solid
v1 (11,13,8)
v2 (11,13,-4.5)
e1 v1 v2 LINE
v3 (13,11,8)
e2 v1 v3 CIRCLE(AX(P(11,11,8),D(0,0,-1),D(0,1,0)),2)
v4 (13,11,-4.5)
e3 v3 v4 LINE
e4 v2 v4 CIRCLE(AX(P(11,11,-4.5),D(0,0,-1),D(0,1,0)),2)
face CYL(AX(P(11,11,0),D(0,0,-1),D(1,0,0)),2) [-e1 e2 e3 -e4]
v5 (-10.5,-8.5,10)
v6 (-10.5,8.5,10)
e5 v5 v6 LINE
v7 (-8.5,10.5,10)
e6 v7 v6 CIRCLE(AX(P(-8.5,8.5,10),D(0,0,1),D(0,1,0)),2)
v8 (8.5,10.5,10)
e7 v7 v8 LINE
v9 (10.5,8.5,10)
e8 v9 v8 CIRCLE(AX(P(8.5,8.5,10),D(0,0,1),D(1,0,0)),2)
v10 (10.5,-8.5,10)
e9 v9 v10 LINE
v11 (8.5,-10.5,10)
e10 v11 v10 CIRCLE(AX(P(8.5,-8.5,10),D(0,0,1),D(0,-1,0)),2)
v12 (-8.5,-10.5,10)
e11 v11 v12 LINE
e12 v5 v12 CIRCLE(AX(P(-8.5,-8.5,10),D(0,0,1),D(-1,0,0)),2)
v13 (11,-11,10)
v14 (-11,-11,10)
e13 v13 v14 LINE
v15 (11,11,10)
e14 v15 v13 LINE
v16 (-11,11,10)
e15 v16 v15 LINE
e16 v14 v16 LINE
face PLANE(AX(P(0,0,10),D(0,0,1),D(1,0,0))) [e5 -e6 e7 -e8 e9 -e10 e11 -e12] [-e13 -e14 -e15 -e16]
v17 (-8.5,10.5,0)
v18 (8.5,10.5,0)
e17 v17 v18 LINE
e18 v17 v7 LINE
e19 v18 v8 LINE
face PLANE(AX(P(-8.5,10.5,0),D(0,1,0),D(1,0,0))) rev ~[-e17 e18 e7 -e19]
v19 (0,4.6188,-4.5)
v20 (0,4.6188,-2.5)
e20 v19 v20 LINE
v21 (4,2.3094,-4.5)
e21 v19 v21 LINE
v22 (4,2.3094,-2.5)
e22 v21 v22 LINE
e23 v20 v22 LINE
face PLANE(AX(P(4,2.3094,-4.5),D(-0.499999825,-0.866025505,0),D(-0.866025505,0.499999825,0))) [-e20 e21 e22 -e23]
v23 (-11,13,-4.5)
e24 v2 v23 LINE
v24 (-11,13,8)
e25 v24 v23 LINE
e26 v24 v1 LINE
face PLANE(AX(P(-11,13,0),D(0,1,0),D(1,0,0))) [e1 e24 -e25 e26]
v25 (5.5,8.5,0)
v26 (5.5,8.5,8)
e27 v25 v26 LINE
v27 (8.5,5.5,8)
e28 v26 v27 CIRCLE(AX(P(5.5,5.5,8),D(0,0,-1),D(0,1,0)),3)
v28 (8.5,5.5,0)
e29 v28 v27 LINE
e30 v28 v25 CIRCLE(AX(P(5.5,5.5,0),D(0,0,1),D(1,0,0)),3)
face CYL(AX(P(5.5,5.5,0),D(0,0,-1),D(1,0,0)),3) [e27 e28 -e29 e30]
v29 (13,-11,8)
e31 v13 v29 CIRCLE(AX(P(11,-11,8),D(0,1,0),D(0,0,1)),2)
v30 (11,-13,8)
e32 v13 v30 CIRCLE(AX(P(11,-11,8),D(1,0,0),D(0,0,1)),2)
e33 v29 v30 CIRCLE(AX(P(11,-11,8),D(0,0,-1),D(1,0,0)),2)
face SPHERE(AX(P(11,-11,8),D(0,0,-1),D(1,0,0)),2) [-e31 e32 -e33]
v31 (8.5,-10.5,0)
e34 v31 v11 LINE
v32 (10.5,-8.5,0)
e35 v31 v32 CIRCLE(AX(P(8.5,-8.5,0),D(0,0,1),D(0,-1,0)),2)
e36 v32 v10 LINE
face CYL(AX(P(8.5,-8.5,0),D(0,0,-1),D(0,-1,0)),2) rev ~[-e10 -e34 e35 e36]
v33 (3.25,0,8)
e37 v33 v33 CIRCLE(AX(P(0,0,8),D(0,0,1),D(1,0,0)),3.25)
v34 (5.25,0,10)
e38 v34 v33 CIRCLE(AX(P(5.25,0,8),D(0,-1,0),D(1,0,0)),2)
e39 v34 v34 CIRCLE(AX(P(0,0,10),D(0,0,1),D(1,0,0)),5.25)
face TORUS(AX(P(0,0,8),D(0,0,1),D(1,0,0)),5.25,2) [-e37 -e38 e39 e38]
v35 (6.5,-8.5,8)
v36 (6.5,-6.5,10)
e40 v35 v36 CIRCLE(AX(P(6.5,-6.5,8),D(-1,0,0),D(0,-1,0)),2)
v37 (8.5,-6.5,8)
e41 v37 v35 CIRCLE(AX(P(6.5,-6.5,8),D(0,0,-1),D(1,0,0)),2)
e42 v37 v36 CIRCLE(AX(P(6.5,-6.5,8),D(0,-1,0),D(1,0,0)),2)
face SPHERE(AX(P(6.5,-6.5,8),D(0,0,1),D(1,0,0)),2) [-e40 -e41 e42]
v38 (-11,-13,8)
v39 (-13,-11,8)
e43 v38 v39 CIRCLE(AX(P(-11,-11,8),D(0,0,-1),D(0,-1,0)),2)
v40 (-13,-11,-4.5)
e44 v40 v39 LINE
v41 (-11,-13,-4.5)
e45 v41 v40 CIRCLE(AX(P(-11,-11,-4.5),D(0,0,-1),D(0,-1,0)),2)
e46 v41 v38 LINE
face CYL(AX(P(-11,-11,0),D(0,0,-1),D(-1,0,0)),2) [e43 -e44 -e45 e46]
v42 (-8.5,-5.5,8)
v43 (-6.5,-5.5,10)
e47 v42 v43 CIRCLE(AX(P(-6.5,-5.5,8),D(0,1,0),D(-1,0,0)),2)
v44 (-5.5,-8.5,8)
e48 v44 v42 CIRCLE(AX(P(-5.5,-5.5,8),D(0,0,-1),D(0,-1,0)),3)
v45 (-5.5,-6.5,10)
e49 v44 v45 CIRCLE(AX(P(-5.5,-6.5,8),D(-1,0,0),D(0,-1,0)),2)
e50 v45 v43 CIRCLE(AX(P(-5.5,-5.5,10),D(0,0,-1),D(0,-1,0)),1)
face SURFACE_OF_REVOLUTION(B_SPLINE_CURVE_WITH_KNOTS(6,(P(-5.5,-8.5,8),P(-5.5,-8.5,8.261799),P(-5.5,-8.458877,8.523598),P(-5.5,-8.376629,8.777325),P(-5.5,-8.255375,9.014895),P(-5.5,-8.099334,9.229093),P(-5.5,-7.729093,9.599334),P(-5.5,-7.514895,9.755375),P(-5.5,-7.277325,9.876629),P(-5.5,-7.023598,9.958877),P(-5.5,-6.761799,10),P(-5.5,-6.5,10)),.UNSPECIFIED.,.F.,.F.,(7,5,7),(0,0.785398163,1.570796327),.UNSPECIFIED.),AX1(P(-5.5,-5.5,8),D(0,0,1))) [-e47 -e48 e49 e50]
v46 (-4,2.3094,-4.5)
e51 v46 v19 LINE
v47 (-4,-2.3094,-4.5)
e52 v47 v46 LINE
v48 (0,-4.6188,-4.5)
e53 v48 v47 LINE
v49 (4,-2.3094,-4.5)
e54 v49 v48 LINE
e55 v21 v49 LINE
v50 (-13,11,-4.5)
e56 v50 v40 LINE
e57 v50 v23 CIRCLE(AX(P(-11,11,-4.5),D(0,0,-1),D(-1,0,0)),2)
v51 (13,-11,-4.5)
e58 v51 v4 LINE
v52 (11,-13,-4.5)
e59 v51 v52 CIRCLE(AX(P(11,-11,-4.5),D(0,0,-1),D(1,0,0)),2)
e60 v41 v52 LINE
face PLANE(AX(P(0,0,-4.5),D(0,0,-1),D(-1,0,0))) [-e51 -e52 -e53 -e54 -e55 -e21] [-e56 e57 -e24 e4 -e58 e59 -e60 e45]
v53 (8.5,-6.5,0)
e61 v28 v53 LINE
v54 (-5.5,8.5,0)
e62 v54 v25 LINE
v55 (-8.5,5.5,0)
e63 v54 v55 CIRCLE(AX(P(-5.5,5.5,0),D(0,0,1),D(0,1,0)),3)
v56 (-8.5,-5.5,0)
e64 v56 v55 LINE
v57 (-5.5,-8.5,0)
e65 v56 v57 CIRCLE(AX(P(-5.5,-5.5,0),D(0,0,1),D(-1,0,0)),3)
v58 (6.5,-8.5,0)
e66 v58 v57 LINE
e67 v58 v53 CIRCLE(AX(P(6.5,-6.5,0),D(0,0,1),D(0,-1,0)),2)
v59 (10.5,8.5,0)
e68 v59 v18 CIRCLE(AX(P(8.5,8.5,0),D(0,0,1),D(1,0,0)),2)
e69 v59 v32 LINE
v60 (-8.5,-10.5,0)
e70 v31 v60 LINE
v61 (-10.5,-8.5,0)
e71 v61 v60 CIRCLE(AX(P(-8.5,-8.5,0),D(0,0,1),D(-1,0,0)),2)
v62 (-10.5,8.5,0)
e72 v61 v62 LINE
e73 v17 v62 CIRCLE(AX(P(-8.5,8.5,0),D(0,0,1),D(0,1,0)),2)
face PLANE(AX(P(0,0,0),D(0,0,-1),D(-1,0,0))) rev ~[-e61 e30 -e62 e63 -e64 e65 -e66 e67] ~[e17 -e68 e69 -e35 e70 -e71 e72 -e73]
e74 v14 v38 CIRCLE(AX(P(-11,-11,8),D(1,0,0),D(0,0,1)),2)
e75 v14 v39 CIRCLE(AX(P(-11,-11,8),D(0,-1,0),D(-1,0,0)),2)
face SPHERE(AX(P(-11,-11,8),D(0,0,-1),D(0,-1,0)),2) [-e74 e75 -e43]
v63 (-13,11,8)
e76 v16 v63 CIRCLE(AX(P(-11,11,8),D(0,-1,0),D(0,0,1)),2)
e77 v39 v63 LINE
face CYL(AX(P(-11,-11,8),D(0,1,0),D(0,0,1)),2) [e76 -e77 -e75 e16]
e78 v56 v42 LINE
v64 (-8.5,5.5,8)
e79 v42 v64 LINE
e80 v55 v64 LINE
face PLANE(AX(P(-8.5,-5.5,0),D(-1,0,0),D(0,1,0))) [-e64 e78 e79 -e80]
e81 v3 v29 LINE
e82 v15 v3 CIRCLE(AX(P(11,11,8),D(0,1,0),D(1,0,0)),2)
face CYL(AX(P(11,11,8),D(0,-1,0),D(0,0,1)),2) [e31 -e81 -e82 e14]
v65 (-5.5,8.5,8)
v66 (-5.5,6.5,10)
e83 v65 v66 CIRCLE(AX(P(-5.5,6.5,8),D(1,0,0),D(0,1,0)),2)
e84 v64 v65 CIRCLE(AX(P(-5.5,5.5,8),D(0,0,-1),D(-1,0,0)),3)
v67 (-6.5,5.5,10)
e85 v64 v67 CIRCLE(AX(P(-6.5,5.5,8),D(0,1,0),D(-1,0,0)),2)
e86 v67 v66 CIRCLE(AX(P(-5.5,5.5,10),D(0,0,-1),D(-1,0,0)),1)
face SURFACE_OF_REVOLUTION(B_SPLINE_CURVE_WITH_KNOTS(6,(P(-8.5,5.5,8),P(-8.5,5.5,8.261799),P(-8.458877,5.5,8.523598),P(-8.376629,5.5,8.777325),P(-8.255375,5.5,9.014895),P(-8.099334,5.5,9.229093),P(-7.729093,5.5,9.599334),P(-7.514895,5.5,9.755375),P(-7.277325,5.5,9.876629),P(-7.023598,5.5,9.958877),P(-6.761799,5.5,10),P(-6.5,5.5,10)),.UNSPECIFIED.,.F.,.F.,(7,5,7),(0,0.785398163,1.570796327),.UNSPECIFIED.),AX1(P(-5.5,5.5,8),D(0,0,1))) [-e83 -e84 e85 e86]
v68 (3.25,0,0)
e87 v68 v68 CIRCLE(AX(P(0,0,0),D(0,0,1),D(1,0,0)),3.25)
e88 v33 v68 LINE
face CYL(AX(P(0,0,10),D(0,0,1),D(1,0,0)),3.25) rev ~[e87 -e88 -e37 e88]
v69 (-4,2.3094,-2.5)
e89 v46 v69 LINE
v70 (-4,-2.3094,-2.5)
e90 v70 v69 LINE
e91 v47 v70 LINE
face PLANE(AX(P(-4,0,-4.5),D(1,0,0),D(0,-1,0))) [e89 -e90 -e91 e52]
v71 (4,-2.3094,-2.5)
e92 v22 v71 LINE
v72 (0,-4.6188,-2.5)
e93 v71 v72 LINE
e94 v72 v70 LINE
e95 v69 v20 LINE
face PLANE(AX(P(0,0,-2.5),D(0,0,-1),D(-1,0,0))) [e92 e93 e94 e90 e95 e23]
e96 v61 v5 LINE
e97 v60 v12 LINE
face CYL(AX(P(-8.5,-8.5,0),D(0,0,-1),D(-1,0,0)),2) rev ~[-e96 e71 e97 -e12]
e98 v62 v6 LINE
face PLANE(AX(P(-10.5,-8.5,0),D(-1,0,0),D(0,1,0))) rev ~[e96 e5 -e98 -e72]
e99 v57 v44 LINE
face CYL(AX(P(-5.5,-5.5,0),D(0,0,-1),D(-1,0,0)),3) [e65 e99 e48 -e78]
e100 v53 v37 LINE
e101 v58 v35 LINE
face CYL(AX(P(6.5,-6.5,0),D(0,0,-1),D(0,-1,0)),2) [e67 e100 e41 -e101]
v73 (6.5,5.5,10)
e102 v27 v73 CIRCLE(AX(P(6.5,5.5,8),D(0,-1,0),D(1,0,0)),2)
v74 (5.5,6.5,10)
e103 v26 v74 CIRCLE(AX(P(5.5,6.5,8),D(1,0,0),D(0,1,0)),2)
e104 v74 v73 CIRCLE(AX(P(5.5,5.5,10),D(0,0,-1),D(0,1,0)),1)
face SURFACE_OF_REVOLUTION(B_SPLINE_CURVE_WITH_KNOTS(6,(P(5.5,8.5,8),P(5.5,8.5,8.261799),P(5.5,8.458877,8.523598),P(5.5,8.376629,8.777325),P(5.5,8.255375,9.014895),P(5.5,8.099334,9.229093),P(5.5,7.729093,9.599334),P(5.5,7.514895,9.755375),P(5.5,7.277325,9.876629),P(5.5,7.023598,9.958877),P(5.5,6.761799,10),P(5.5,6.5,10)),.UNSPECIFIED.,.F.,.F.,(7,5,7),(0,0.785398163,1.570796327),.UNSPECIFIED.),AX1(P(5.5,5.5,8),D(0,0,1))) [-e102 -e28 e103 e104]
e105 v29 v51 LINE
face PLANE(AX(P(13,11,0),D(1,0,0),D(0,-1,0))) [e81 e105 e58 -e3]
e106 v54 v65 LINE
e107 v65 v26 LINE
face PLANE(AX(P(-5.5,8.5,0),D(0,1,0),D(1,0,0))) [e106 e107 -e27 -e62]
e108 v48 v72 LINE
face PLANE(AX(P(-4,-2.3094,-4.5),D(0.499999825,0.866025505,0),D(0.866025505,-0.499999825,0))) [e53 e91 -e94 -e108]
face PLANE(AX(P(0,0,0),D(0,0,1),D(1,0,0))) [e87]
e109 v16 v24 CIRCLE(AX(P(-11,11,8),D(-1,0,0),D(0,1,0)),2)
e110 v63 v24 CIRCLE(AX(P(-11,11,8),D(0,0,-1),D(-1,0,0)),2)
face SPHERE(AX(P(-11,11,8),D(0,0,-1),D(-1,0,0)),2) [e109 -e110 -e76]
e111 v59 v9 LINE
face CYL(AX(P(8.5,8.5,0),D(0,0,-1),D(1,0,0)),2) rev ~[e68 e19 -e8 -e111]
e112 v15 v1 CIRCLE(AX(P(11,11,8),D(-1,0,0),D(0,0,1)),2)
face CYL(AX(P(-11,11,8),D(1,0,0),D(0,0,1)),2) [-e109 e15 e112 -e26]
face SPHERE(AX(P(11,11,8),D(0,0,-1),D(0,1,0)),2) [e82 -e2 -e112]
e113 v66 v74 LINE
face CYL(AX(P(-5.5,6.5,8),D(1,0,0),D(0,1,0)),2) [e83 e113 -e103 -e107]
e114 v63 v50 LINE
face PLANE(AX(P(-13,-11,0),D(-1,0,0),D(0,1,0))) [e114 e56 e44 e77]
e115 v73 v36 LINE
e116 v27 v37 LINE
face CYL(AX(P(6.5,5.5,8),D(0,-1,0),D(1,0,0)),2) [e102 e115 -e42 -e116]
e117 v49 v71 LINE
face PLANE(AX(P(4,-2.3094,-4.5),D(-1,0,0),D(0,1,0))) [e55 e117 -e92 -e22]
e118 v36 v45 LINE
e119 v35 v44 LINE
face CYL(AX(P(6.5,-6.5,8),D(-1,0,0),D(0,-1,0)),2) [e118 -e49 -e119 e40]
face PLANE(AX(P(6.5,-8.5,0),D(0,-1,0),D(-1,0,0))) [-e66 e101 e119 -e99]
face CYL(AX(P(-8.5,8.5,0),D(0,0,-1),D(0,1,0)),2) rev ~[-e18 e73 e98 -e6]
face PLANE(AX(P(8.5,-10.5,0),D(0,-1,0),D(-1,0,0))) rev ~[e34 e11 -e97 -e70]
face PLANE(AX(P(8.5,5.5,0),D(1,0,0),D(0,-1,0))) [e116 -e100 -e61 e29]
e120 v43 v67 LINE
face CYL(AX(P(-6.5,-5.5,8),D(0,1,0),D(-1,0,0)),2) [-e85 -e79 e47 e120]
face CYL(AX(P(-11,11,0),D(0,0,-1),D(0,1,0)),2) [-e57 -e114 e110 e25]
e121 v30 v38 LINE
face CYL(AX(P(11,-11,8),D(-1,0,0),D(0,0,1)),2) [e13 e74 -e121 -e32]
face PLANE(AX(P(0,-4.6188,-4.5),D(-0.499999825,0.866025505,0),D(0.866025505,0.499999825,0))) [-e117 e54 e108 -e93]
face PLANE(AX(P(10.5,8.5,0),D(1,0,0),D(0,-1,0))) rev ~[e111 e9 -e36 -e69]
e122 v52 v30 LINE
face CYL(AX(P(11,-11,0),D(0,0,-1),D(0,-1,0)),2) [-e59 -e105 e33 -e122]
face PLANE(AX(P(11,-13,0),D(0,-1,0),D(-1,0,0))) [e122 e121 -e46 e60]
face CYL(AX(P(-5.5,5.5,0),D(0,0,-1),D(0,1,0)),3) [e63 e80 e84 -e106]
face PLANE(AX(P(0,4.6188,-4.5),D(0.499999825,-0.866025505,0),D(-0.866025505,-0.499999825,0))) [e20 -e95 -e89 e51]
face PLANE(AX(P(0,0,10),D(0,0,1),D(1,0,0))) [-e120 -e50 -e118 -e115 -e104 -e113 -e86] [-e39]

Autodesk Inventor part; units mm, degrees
ref_plane "YZ Plane" through (0, 0, 0) normal (1, 0, 0) x (0, 1, 0)
ref_plane "XZ Plane" through (0, 0, 0) normal (0, 1, 0) x (-1, 0, 0)
ref_plane "XY Plane" through (0, 0, 0) normal (0, 0, 1) x (1, 0, 0)
sketch "Schizzo1" plane through (0, 0, 0) normal (0, 0, 1) x (1, 0, 0)
  line L0 (6.5, -8.5) -> (-5.5, -8.5)
  line L1 (-8.5, -5.5) -> (-8.5, 5.5)
  line L2 (-5.5, 8.5) -> (5.5, 8.5)
  line L3 (8.5, 5.5) -> (8.5, -6.5)
  arc A0 (6.5, -8.5) -> (8.5, -6.5) centre (6.5, -6.5) ccw
  arc A1 (-8.5, -5.5) -> (-5.5, -8.5) centre (-5.5, -5.5) ccw
  arc A2 (-5.5, 8.5) -> (-8.5, 5.5) centre (-5.5, 5.5) ccw
  arc A3 (8.5, 5.5) -> (5.5, 8.5) centre (5.5, 5.5) ccw
  point P0 (0, 0)
  point P1 (0, 0)
  point P2 (8.5, -8.5)
  point P3 (-8.5, -8.5)
  point P4 (-8.5, 8.5)
  point P5 (8.5, 8.5)
  dimension "d0" = 17
  dimension "d44" = 2
  dimension "d45" = 3
extrude "Estrusione1" add sketch "Schizzo1" along normal blind 10
sketch "Schizzo2" plane through (0, 0, 0) normal (0, 0, -1) x (-1, 0, 0)
  line L0 (11, -13) -> (-11, -13)
  line L1 (-13, -11) -> (-13, 11)
  line L2 (-11, 13) -> (11, 13)
  line L3 (13, 11) -> (13, -11)
  line L4 (13, -13) -> (-13, 13) construction
  line L5 (-13, -13) -> (13, 13) construction
  arc A0 (13, 11) -> (11, 13) centre (11, 11) ccw
  arc A1 (11, -13) -> (13, -11) centre (11, -11) ccw
  arc A2 (-13, -11) -> (-11, -13) centre (-11, -11) ccw
  arc A3 (-11, 13) -> (-13, 11) centre (-11, 11) ccw
  point P0 (0, 0)
  dimension "d3" = 26
  dimension "d4" = 26
  dimension "d145" = 2
extrude "Estrusione2" add sketch "Schizzo2" along normal blind 4.5
sketch "Schizzo12" plane through (0, 0, 0) normal (0, 0, 1) x (1, 0, 0)
  line L0 (-10.5, -8.5) -> (-10.5, 8.5)
  line L1 (-8.5, 10.5) -> (8.5, 10.5)
  line L2 (10.5, 8.5) -> (10.5, -8.5)
  line L3 (8.5, -10.5) -> (-8.5, -10.5)
  line L4 (-13, -11) -> (-13, 11)
  line L5 (-11, 13) -> (11, 13)
  line L6 (13, 11) -> (13, -11)
  line L7 (11, -13) -> (-11, -13)
  arc A0 (10.5, 8.5) -> (8.5, 10.5) centre (8.5, 8.5) ccw
  arc A1 (13, 11) -> (11, 13) centre (11, 11) ccw
  arc A2 (11, -13) -> (13, -11) centre (11, -11) ccw
  arc A3 (8.5, -10.5) -> (10.5, -8.5) centre (8.5, -8.5) ccw
  arc A4 (-13, -11) -> (-11, -13) centre (-11, -11) ccw
  arc A5 (-10.5, -8.5) -> (-8.5, -10.5) centre (-8.5, -8.5) ccw
  arc A6 (-11, 13) -> (-13, 11) centre (-11, 11) ccw
  arc A7 (-8.5, 10.5) -> (-10.5, 8.5) centre (-8.5, 8.5) ccw
  point P0 (0, 0)
  point P1 (0, 0)
  point P2 (-10.5, -10.5)
  point P3 (-10.5, 10.5)
  point P4 (10.5, 10.5)
  point P5 (10.5, -10.5)
  point P6 (0, 0)
  point P7 (-13, -13)
  point P8 (-13, 13)
  point P9 (13, 13)
  point P10 (13, -13)
  dimension "d110" = 21
  dimension "d111" = 26
  dimension "d112" = 2
extrude "Estrusione6" add sketch "Schizzo12" along normal blind 10
fillet "Raccordo3" radius 2 1 edges at (0, -13, 10)
fillet "Raccordo8" radius 2 1 edges at (0, 8.5, 10)
sketch "Schizzo20" plane through (0, 0, 10) normal (0, 0, 1) x (1, 0, 0)
  circle A0 centre (0, 0) radius 3.25
  dimension "d176" = 6.5
extrude "Estrusione9" cut sketch "Schizzo20" against normal blind 10
fillet "Raccordo9" radius 2 1 edges at (-3.25, 0, 10)
sketch "Schizzo21" plane through (0, 0, -4.5) normal (0, 0, -1) x (-1, 0, 0)
  circle A0 centre (0, 0) radius 4
  line L0 (-4, 2.3094) -> (0, 4.6188)
  line L1 (0, 4.6188) -> (4, 2.3094)
  line L2 (4, 2.3094) -> (4, -2.3094)
  line L3 (4, -2.3094) -> (0, -4.6188)
  line L4 (0, -4.6188) -> (-4, -2.3094)
  line L5 (-4, -2.3094) -> (-4, 2.3094)
  point P0 (-4, 0)
  dimension "d180" = 8
extrude "Estrusione10" cut sketch "Schizzo21" against normal blind 2
properties part number "2_Connettore_inf_sup"
